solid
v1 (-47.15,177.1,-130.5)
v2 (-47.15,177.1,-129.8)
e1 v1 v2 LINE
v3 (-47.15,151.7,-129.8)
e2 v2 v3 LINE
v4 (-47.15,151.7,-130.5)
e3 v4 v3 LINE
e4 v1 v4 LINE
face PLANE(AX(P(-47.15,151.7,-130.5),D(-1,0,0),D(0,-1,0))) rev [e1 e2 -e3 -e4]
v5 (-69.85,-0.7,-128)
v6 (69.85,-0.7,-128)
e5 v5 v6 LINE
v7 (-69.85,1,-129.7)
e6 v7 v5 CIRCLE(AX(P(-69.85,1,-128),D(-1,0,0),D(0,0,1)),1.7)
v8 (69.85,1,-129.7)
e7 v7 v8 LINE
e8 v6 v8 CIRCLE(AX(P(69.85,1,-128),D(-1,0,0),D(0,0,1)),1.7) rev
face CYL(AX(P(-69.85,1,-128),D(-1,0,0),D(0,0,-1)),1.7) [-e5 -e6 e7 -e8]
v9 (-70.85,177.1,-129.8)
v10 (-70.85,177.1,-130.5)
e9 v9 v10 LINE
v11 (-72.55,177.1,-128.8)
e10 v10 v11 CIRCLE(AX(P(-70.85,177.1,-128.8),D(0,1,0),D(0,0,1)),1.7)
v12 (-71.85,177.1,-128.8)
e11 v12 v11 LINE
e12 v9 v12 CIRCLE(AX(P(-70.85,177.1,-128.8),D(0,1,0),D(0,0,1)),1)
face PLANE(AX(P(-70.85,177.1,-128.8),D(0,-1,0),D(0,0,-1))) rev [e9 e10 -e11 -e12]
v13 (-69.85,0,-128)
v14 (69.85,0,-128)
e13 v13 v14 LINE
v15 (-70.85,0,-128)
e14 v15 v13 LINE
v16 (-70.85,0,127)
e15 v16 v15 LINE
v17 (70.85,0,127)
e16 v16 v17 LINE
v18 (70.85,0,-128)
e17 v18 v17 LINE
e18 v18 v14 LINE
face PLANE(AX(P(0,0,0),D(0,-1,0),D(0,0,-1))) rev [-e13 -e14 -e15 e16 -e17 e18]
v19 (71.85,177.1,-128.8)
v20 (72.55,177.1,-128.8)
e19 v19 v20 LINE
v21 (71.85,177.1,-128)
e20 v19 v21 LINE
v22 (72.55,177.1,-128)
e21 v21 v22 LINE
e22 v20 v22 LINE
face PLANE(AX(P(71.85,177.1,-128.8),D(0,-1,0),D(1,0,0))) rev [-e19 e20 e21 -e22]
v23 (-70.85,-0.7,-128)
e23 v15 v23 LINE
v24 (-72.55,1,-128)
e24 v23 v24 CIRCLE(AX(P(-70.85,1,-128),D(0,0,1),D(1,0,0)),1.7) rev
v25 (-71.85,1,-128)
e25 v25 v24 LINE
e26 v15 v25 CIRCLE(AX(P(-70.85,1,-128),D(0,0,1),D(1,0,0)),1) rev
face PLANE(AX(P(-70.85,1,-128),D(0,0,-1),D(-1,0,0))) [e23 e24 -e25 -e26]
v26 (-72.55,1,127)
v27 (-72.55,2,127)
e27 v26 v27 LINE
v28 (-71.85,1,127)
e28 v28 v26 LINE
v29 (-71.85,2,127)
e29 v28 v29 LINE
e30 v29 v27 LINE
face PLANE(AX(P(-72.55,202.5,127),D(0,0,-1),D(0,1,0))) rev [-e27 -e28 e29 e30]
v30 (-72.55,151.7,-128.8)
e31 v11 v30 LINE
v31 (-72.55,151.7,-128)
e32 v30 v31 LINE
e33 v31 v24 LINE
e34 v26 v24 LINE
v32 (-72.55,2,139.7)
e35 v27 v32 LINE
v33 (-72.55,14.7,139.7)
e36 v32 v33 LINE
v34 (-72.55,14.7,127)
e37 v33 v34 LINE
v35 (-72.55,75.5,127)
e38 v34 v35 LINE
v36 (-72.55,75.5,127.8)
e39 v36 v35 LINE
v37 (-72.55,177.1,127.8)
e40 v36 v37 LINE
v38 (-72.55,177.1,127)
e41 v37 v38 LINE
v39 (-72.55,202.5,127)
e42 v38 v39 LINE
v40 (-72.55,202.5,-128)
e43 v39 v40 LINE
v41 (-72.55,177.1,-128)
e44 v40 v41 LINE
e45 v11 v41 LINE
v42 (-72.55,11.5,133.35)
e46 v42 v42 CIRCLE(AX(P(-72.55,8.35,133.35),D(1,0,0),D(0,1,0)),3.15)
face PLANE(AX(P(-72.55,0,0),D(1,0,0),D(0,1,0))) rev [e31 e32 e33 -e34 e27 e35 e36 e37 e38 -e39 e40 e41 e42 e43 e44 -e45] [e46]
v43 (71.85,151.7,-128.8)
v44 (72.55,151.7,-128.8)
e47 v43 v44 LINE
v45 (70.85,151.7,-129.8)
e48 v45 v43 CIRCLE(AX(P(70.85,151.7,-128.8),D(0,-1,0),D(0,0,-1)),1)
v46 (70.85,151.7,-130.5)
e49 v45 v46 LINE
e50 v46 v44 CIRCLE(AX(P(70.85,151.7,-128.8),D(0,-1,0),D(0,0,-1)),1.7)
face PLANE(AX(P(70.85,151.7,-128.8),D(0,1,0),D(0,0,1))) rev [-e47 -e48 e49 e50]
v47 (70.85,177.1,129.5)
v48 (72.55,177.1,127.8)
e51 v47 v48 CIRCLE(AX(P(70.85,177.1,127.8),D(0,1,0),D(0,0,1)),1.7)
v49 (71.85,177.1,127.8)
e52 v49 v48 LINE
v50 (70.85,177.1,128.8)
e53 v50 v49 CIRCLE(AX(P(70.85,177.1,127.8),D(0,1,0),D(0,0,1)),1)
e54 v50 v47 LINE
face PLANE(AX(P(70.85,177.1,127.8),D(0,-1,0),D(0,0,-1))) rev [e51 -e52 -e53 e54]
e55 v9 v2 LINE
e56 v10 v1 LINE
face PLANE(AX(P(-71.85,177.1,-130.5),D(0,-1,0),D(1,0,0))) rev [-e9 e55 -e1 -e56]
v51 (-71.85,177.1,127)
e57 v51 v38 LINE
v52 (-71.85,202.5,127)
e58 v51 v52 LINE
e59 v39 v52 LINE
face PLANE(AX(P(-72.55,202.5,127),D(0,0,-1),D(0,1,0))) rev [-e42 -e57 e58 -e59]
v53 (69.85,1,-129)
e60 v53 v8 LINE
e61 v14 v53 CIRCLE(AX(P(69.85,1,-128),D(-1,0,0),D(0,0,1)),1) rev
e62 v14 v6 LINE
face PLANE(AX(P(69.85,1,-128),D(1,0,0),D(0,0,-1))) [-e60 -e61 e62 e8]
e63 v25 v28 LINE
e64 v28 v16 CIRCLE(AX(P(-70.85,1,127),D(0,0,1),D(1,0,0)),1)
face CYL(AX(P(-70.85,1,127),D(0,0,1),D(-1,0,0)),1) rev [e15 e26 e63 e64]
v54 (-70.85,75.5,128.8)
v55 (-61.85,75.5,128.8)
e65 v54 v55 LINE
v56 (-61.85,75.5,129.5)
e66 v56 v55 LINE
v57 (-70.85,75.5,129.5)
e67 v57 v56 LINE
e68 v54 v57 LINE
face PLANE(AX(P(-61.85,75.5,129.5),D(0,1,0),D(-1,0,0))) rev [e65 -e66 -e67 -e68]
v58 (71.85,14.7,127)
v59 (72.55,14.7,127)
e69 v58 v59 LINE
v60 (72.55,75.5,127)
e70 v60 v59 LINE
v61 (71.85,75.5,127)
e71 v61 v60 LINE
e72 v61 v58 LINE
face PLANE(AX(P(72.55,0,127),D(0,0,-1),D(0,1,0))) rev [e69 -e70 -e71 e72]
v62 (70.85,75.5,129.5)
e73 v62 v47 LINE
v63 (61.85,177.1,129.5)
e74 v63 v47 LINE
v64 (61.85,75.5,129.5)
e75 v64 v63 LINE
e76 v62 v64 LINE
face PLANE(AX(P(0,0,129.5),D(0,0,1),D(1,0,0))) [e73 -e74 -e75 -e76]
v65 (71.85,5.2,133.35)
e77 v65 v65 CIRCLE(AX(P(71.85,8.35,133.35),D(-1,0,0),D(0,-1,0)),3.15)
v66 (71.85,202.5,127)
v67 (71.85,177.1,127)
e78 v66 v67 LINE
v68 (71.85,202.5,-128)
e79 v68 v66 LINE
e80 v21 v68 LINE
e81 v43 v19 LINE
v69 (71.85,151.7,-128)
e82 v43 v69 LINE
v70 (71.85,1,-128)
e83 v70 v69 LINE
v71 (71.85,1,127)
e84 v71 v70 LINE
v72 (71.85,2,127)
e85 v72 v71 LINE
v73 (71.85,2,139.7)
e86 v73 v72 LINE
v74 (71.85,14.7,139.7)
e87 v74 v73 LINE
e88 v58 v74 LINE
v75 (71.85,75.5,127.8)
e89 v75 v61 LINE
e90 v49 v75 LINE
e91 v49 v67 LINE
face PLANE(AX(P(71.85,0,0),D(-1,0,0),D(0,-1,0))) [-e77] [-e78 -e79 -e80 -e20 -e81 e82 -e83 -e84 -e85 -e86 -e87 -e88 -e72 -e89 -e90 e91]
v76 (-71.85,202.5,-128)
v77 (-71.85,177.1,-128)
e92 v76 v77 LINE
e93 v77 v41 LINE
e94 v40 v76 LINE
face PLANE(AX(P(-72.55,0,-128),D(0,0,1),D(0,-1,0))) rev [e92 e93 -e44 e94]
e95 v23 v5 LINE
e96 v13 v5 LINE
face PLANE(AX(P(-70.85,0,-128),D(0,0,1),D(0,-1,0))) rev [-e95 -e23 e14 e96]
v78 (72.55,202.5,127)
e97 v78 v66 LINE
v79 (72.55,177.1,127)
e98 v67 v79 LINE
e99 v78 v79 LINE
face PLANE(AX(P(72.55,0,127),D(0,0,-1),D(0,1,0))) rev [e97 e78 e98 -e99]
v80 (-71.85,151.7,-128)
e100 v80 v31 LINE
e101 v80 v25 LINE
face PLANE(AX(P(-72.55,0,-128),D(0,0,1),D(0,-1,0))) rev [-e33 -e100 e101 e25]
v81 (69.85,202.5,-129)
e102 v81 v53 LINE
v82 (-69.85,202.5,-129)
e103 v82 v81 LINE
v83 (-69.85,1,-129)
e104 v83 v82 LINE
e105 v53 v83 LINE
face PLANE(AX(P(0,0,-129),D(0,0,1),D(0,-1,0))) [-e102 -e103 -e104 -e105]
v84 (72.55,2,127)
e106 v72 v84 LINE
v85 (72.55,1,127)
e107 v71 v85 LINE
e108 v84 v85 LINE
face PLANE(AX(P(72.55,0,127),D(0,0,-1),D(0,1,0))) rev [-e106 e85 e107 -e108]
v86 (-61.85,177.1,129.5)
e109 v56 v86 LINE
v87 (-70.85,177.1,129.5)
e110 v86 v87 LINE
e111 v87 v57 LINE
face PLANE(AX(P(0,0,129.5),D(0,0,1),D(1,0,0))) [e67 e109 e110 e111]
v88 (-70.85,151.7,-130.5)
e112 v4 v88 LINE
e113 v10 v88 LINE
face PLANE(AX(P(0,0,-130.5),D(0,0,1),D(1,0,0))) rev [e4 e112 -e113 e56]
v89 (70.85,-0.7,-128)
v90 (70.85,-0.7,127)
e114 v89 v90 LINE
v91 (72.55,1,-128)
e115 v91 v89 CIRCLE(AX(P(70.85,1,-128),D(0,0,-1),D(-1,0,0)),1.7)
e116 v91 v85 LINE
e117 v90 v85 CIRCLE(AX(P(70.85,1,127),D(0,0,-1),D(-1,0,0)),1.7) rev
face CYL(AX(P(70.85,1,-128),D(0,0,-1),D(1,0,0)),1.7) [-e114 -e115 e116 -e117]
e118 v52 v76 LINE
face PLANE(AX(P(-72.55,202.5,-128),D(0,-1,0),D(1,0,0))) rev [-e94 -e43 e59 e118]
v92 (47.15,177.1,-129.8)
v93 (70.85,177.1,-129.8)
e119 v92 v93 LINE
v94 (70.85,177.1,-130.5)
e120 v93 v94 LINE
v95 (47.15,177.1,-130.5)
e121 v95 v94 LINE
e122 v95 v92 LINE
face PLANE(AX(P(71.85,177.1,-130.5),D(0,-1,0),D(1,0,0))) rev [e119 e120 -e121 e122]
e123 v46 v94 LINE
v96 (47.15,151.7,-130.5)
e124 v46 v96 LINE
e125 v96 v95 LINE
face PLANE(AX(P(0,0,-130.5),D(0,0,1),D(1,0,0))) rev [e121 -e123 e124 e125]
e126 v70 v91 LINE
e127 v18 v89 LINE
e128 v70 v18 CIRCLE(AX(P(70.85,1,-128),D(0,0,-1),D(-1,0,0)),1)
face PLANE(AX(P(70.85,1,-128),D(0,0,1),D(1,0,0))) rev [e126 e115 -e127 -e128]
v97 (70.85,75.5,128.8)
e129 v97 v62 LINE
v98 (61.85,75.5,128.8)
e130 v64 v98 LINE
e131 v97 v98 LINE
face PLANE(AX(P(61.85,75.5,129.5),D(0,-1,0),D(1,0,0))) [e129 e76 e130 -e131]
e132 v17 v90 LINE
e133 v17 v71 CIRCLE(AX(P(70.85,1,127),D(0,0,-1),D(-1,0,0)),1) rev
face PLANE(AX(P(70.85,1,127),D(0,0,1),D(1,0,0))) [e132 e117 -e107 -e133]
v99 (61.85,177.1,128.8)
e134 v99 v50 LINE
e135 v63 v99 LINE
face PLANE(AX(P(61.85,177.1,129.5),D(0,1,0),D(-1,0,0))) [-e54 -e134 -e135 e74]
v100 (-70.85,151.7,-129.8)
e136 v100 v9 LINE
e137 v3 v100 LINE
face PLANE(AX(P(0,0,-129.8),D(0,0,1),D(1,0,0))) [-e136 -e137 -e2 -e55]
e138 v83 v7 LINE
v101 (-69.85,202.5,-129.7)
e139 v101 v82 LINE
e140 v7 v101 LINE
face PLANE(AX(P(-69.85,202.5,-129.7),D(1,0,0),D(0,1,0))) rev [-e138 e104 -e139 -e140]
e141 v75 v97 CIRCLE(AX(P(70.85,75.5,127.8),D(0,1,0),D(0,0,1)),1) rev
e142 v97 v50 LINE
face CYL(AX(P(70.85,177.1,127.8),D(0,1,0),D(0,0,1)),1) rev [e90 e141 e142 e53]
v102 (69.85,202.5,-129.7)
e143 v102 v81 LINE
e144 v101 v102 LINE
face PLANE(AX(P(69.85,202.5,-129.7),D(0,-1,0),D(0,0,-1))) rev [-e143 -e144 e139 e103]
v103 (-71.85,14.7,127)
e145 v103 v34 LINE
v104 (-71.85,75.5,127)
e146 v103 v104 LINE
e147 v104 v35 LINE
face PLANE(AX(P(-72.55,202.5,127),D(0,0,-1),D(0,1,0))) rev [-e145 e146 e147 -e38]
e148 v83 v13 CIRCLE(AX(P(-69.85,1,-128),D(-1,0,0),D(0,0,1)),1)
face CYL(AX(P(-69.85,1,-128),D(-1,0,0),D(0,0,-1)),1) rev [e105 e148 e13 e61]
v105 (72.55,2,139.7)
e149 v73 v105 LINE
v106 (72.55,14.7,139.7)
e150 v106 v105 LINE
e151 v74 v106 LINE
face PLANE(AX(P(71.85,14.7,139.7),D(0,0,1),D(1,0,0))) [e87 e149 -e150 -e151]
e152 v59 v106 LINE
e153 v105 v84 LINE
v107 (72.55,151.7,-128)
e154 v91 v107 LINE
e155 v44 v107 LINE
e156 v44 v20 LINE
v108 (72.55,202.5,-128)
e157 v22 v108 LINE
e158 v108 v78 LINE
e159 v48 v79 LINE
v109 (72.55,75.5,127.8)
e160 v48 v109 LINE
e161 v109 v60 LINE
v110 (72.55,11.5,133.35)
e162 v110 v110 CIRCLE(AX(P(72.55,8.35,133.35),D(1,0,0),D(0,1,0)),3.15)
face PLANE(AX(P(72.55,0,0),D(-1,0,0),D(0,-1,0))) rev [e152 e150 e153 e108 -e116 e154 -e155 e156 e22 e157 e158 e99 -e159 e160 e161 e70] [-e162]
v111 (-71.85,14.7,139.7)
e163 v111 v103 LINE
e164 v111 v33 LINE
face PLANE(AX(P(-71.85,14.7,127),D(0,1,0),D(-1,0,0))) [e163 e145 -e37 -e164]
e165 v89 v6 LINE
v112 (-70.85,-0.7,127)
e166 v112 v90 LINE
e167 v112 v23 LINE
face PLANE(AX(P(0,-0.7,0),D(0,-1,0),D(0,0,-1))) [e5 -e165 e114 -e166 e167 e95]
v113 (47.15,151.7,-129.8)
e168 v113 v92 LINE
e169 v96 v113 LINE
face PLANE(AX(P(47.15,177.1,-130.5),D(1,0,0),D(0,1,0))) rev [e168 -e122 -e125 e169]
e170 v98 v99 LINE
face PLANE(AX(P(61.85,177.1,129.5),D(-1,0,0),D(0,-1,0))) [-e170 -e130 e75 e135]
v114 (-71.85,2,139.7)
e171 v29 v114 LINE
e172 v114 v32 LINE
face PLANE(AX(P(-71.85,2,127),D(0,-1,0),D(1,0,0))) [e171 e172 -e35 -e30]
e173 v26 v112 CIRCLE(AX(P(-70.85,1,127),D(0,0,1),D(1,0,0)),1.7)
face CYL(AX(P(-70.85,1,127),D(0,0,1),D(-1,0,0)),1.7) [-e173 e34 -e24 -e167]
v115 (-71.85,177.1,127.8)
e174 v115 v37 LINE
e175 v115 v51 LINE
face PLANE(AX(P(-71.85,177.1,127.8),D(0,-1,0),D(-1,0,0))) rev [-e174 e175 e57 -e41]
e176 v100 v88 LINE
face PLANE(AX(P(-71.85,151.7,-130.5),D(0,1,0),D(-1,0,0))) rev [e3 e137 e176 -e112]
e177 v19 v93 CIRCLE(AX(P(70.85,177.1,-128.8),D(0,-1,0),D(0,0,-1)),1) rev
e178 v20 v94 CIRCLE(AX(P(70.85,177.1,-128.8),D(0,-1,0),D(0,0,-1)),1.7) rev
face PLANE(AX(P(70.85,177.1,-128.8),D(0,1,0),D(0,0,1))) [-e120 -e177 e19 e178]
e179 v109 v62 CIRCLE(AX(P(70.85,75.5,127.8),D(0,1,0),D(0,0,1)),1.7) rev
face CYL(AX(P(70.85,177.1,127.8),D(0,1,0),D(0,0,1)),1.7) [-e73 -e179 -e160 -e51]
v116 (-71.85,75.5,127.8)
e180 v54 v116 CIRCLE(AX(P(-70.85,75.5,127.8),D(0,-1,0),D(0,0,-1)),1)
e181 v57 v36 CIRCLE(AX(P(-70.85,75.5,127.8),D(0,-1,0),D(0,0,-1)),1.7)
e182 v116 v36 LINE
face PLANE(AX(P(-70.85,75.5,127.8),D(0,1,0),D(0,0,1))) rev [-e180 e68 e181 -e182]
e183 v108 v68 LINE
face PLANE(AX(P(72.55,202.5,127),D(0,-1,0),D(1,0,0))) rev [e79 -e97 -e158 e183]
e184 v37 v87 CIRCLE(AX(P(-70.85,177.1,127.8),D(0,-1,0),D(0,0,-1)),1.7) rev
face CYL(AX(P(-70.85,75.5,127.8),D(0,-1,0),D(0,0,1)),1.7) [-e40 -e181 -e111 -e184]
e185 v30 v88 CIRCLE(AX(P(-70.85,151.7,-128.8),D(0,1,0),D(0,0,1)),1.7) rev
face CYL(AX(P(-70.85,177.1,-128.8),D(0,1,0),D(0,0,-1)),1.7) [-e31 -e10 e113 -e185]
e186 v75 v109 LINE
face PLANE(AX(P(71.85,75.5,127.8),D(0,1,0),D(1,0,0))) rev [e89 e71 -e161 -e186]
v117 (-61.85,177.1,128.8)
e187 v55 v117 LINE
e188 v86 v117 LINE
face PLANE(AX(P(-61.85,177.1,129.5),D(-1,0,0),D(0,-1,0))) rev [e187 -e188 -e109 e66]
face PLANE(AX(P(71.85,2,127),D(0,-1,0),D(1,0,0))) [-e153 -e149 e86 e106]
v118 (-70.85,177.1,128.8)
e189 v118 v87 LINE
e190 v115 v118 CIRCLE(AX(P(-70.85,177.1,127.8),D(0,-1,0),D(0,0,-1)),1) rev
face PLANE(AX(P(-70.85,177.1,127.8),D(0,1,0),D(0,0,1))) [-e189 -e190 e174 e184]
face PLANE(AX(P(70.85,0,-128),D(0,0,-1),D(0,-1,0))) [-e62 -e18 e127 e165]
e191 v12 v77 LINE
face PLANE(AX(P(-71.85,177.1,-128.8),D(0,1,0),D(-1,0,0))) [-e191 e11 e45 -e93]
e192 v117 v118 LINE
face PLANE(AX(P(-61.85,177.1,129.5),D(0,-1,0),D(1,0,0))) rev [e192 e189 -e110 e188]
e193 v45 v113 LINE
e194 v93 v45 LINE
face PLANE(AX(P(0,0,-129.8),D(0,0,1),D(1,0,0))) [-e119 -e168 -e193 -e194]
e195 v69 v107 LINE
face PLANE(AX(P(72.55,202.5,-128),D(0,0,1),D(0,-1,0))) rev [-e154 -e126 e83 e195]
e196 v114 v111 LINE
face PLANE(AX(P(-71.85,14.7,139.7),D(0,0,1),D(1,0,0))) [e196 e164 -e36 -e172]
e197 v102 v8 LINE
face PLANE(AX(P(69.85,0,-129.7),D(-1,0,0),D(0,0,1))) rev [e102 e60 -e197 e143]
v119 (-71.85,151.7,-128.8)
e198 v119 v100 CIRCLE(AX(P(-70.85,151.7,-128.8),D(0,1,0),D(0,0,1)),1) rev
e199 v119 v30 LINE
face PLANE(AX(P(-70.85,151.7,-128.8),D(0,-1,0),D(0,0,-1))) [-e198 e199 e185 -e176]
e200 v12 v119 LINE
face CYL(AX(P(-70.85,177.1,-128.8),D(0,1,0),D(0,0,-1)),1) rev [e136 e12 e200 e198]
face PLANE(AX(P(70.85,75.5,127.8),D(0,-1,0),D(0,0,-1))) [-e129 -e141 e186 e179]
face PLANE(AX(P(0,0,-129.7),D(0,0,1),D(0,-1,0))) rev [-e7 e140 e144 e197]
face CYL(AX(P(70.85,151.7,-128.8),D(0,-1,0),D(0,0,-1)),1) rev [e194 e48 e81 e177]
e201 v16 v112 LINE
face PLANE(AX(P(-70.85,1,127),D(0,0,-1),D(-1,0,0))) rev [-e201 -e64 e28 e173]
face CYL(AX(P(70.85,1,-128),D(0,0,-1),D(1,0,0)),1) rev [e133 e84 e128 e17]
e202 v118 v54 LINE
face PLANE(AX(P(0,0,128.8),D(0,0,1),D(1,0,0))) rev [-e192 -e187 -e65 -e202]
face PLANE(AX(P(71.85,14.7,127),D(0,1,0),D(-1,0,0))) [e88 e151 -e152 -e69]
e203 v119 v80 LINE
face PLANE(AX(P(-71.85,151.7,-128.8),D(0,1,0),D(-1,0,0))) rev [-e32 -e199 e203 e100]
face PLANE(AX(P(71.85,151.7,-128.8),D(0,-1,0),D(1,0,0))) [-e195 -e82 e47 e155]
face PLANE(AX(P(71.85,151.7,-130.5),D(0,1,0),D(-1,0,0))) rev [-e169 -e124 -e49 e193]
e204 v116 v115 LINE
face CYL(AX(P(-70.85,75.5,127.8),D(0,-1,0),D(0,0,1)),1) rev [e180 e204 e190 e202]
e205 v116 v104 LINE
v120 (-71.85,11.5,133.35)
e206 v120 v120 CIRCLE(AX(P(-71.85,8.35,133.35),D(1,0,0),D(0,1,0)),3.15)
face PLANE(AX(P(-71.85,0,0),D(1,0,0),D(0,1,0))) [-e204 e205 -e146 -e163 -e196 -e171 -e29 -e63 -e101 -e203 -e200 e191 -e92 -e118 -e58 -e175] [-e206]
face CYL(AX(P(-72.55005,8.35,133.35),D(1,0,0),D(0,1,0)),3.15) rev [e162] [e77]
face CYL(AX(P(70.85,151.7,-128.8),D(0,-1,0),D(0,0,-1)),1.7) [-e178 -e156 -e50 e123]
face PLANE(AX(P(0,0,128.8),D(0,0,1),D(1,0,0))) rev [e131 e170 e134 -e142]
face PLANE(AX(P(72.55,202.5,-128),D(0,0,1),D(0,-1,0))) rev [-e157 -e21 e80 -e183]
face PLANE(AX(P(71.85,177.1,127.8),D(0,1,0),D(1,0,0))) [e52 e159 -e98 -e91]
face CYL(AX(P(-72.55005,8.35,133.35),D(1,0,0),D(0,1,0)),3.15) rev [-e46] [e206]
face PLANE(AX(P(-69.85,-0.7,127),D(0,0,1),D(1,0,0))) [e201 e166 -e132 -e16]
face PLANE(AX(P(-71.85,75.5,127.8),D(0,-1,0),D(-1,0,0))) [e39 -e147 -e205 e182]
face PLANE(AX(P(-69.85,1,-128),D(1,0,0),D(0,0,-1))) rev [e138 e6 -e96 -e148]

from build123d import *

# Parameters (mm, degrees)
SKETCH2_W           = 139.7
SKETCH2_H           = 254
BASE_FLANGE1_DEPTH  = 0.7
EDGE_FLANGE4_DEPTH  = 139.7
EDGE_FLANGE5_DEPTH  = 255
EDGE_FLANGE6_DEPTH  = 255
EDGE_FLANGE7_DEPTH  = 25.4
EDGE_FLANGE9_DEPTH  = 25.4
EDGE_FLANGE10_DEPTH = 101.6
EDGE_FLANGE11_DEPTH = 101.6
SKETCH76_W          = 12.7
SKETCH76_H          = 12.7
TAB1_DEPTH          = 0.7
SKETCH79_W          = 12.7
SKETCH79_H          = 12.7
TAB2_DEPTH          = 0.7
SKETCH86_R          = 3.15
CUT_EXTRUDE3_DEPTH  = 286.615738362


# Sheet-metal steps are written as plain solids
with BuildPart() as part:
    # Sketch2 → Base-Flange1 (new body)
    with BuildSketch(Plane(origin=(0, 0, 0), x_dir=(1, 0, 0), z_dir=(0, 1, 0))):
        Rectangle(SKETCH2_W, SKETCH2_H)
    extrude(amount=-BASE_FLANGE1_DEPTH)

    # Edge-Flange4 section (across the edge) → Edge-Flange4 (add)
    with BuildSketch(Plane(origin=(69.85, 0, -129), x_dir=(0, 0, 1), z_dir=(-1, 0, 0))):
        with BuildLine():
            Line((-0.7, 1), (-0.7, 202.5))
            Line((-0.7, 202.5), (0, 202.5))
            Line((0, 202.5), (0, 1))
            ThreePointArc((0, 1), (0.292893219, 0.292893219), (1, 0))
            Line((1, 0), (2, 0))
            Line((2, 0), (2, -0.7))
            Line((2, -0.7), (1, -0.7))
            ThreePointArc((1, -0.7), (-0.202081528, -0.202081528), (-0.7, 1))
        make_face()
    extrude(amount=EDGE_FLANGE4_DEPTH)

    # Edge-Flange5 section (across the edge) → Edge-Flange5 (add)
    with BuildSketch(Plane(origin=(-71.85, 0, -128), x_dir=(1, 0, 0), z_dir=(0, 0, 1))):
        with BuildLine():
            Line((-0.7, 1), (-0.7, 202.5))
            Line((-0.7, 202.5), (0, 202.5))
            Line((0, 202.5), (0, 1))
            ThreePointArc((0, 1), (0.292893219, 0.292893219), (1, 0))
            Line((1, 0), (2, 0))
            Line((2, 0), (2, -0.7))
            Line((2, -0.7), (1, -0.7))
            ThreePointArc((1, -0.7), (-0.202081528, -0.202081528), (-0.7, 1))
        make_face()
    extrude(amount=EDGE_FLANGE5_DEPTH)

    # Edge-Flange6 section (across the edge) → Edge-Flange6 (add)
    with BuildSketch(Plane(origin=(71.85, 0, 127), x_dir=(-1, 0, 0), z_dir=(0, 0, -1))):
        with BuildLine():
            Line((-0.7, 1), (-0.7, 202.5))
            Line((-0.7, 202.5), (0, 202.5))
            Line((0, 202.5), (0, 1))
            ThreePointArc((0, 1), (0.292893219, 0.292893219), (1, 0))
            Line((1, 0), (2, 0))
            Line((2, 0), (2, -0.7))
            Line((2, -0.7), (1, -0.7))
            ThreePointArc((1, -0.7), (-0.202081528, -0.202081528), (-0.7, 1))
        make_face()
    extrude(amount=EDGE_FLANGE6_DEPTH)

    # Edge-Flange7 section (across the edge) → Edge-Flange7 (add)
    with BuildSketch(Plane(origin=(-71.85, 151.7, -129.8), x_dir=(0, 0, 1), z_dir=(0, 1, 0))):
        with BuildLine():
            Line((-0.7, 1), (-0.7, 24.7))
            Line((-0.7, 24.7), (0, 24.7))
            Line((0, 24.7), (0, 1))
            ThreePointArc((0, 1), (0.292893219, 0.292893219), (1, 0))
            Line((1, 0), (1.8, 0))
            Line((1.8, 0), (1.8, -0.7))
            Line((1.8, -0.7), (1, -0.7))
            ThreePointArc((1, -0.7), (-0.202081528, -0.202081528), (-0.7, 1))
        make_face()
    extrude(amount=EDGE_FLANGE7_DEPTH)

    # Edge-Flange9 section (across the edge) → Edge-Flange9 (add)
    with BuildSketch(Plane(origin=(71.85, 177.1, -129.8), x_dir=(0, 0, 1), z_dir=(0, -1, 0))):
        with BuildLine():
            Line((-0.7, 1), (-0.7, 24.7))
            Line((-0.7, 24.7), (0, 24.7))
            Line((0, 24.7), (0, 1))
            ThreePointArc((0, 1), (0.292893219, 0.292893219), (1, 0))
            Line((1, 0), (1.8, 0))
            Line((1.8, 0), (1.8, -0.7))
            Line((1.8, -0.7), (1, -0.7))
            ThreePointArc((1, -0.7), (-0.202081528, -0.202081528), (-0.7, 1))
        make_face()
    extrude(amount=EDGE_FLANGE9_DEPTH)

    # Edge-Flange10 section (across the edge) → Edge-Flange10 (add)
    with BuildSketch(Plane(origin=(71.85, 75.5, 128.8), x_dir=(0, 0, -1), z_dir=(0, 1, 0))):
        with BuildLine():
            Line((-0.7, 1), (-0.7, 10))
            Line((-0.7, 10), (0, 10))
            Line((0, 10), (0, 1))
            ThreePointArc((0, 1), (0.292893219, 0.292893219), (1, 0))
            Line((1, 0), (1.8, 0))
            Line((1.8, 0), (1.8, -0.7))
            Line((1.8, -0.7), (1, -0.7))
            ThreePointArc((1, -0.7), (-0.202081528, -0.202081528), (-0.7, 1))
        make_face()
    extrude(amount=EDGE_FLANGE10_DEPTH)

    # Edge-Flange11 section (across the edge) → Edge-Flange11 (add)
    with BuildSketch(Plane(origin=(-71.85, 177.1, 128.8), x_dir=(0, 0, -1), z_dir=(0, -1, 0))):
        with BuildLine():
            Line((-0.7, 1), (-0.7, 10))
            Line((-0.7, 10), (0, 10))
            Line((0, 10), (0, 1))
            ThreePointArc((0, 1), (0.292893219, 0.292893219), (1, 0))
            Line((1, 0), (1.8, 0))
            Line((1.8, 0), (1.8, -0.7))
            Line((1.8, -0.7), (1, -0.7))
            ThreePointArc((1, -0.7), (-0.202081528, -0.202081528), (-0.7, 1))
        make_face()
    extrude(amount=EDGE_FLANGE11_DEPTH)

    # Sketch76 → Tab1 (add)
    with BuildSketch(Plane.ZY.offset(72.55)):
        with Locations((133.35, 8.35)):
            Rectangle(SKETCH76_W, SKETCH76_H)
    extrude(amount=-TAB1_DEPTH)

    # Sketch79 → Tab2 (add)
    with BuildSketch(Plane(origin=(72.55, 0, 0), x_dir=(0, 0, -1), z_dir=(1, 0, 0))):
        with Locations((-133.35, 8.35)):
            Rectangle(SKETCH79_W, SKETCH79_H)
    extrude(amount=-TAB2_DEPTH)

    # Sketch86 → Cut-Extrude3 (cut, through all)
    with BuildSketch(Plane(origin=(72.55, 0, 0), x_dir=(0, 0, -1), z_dir=(1, 0, 0))):
        with Locations(Location((-133.35, 8.35, 0), (0, 0, 90))):
            Circle(SKETCH86_R)
    extrude(amount=-CUT_EXTRUDE3_DEPTH, mode=Mode.SUBTRACT)


solid = part.part
